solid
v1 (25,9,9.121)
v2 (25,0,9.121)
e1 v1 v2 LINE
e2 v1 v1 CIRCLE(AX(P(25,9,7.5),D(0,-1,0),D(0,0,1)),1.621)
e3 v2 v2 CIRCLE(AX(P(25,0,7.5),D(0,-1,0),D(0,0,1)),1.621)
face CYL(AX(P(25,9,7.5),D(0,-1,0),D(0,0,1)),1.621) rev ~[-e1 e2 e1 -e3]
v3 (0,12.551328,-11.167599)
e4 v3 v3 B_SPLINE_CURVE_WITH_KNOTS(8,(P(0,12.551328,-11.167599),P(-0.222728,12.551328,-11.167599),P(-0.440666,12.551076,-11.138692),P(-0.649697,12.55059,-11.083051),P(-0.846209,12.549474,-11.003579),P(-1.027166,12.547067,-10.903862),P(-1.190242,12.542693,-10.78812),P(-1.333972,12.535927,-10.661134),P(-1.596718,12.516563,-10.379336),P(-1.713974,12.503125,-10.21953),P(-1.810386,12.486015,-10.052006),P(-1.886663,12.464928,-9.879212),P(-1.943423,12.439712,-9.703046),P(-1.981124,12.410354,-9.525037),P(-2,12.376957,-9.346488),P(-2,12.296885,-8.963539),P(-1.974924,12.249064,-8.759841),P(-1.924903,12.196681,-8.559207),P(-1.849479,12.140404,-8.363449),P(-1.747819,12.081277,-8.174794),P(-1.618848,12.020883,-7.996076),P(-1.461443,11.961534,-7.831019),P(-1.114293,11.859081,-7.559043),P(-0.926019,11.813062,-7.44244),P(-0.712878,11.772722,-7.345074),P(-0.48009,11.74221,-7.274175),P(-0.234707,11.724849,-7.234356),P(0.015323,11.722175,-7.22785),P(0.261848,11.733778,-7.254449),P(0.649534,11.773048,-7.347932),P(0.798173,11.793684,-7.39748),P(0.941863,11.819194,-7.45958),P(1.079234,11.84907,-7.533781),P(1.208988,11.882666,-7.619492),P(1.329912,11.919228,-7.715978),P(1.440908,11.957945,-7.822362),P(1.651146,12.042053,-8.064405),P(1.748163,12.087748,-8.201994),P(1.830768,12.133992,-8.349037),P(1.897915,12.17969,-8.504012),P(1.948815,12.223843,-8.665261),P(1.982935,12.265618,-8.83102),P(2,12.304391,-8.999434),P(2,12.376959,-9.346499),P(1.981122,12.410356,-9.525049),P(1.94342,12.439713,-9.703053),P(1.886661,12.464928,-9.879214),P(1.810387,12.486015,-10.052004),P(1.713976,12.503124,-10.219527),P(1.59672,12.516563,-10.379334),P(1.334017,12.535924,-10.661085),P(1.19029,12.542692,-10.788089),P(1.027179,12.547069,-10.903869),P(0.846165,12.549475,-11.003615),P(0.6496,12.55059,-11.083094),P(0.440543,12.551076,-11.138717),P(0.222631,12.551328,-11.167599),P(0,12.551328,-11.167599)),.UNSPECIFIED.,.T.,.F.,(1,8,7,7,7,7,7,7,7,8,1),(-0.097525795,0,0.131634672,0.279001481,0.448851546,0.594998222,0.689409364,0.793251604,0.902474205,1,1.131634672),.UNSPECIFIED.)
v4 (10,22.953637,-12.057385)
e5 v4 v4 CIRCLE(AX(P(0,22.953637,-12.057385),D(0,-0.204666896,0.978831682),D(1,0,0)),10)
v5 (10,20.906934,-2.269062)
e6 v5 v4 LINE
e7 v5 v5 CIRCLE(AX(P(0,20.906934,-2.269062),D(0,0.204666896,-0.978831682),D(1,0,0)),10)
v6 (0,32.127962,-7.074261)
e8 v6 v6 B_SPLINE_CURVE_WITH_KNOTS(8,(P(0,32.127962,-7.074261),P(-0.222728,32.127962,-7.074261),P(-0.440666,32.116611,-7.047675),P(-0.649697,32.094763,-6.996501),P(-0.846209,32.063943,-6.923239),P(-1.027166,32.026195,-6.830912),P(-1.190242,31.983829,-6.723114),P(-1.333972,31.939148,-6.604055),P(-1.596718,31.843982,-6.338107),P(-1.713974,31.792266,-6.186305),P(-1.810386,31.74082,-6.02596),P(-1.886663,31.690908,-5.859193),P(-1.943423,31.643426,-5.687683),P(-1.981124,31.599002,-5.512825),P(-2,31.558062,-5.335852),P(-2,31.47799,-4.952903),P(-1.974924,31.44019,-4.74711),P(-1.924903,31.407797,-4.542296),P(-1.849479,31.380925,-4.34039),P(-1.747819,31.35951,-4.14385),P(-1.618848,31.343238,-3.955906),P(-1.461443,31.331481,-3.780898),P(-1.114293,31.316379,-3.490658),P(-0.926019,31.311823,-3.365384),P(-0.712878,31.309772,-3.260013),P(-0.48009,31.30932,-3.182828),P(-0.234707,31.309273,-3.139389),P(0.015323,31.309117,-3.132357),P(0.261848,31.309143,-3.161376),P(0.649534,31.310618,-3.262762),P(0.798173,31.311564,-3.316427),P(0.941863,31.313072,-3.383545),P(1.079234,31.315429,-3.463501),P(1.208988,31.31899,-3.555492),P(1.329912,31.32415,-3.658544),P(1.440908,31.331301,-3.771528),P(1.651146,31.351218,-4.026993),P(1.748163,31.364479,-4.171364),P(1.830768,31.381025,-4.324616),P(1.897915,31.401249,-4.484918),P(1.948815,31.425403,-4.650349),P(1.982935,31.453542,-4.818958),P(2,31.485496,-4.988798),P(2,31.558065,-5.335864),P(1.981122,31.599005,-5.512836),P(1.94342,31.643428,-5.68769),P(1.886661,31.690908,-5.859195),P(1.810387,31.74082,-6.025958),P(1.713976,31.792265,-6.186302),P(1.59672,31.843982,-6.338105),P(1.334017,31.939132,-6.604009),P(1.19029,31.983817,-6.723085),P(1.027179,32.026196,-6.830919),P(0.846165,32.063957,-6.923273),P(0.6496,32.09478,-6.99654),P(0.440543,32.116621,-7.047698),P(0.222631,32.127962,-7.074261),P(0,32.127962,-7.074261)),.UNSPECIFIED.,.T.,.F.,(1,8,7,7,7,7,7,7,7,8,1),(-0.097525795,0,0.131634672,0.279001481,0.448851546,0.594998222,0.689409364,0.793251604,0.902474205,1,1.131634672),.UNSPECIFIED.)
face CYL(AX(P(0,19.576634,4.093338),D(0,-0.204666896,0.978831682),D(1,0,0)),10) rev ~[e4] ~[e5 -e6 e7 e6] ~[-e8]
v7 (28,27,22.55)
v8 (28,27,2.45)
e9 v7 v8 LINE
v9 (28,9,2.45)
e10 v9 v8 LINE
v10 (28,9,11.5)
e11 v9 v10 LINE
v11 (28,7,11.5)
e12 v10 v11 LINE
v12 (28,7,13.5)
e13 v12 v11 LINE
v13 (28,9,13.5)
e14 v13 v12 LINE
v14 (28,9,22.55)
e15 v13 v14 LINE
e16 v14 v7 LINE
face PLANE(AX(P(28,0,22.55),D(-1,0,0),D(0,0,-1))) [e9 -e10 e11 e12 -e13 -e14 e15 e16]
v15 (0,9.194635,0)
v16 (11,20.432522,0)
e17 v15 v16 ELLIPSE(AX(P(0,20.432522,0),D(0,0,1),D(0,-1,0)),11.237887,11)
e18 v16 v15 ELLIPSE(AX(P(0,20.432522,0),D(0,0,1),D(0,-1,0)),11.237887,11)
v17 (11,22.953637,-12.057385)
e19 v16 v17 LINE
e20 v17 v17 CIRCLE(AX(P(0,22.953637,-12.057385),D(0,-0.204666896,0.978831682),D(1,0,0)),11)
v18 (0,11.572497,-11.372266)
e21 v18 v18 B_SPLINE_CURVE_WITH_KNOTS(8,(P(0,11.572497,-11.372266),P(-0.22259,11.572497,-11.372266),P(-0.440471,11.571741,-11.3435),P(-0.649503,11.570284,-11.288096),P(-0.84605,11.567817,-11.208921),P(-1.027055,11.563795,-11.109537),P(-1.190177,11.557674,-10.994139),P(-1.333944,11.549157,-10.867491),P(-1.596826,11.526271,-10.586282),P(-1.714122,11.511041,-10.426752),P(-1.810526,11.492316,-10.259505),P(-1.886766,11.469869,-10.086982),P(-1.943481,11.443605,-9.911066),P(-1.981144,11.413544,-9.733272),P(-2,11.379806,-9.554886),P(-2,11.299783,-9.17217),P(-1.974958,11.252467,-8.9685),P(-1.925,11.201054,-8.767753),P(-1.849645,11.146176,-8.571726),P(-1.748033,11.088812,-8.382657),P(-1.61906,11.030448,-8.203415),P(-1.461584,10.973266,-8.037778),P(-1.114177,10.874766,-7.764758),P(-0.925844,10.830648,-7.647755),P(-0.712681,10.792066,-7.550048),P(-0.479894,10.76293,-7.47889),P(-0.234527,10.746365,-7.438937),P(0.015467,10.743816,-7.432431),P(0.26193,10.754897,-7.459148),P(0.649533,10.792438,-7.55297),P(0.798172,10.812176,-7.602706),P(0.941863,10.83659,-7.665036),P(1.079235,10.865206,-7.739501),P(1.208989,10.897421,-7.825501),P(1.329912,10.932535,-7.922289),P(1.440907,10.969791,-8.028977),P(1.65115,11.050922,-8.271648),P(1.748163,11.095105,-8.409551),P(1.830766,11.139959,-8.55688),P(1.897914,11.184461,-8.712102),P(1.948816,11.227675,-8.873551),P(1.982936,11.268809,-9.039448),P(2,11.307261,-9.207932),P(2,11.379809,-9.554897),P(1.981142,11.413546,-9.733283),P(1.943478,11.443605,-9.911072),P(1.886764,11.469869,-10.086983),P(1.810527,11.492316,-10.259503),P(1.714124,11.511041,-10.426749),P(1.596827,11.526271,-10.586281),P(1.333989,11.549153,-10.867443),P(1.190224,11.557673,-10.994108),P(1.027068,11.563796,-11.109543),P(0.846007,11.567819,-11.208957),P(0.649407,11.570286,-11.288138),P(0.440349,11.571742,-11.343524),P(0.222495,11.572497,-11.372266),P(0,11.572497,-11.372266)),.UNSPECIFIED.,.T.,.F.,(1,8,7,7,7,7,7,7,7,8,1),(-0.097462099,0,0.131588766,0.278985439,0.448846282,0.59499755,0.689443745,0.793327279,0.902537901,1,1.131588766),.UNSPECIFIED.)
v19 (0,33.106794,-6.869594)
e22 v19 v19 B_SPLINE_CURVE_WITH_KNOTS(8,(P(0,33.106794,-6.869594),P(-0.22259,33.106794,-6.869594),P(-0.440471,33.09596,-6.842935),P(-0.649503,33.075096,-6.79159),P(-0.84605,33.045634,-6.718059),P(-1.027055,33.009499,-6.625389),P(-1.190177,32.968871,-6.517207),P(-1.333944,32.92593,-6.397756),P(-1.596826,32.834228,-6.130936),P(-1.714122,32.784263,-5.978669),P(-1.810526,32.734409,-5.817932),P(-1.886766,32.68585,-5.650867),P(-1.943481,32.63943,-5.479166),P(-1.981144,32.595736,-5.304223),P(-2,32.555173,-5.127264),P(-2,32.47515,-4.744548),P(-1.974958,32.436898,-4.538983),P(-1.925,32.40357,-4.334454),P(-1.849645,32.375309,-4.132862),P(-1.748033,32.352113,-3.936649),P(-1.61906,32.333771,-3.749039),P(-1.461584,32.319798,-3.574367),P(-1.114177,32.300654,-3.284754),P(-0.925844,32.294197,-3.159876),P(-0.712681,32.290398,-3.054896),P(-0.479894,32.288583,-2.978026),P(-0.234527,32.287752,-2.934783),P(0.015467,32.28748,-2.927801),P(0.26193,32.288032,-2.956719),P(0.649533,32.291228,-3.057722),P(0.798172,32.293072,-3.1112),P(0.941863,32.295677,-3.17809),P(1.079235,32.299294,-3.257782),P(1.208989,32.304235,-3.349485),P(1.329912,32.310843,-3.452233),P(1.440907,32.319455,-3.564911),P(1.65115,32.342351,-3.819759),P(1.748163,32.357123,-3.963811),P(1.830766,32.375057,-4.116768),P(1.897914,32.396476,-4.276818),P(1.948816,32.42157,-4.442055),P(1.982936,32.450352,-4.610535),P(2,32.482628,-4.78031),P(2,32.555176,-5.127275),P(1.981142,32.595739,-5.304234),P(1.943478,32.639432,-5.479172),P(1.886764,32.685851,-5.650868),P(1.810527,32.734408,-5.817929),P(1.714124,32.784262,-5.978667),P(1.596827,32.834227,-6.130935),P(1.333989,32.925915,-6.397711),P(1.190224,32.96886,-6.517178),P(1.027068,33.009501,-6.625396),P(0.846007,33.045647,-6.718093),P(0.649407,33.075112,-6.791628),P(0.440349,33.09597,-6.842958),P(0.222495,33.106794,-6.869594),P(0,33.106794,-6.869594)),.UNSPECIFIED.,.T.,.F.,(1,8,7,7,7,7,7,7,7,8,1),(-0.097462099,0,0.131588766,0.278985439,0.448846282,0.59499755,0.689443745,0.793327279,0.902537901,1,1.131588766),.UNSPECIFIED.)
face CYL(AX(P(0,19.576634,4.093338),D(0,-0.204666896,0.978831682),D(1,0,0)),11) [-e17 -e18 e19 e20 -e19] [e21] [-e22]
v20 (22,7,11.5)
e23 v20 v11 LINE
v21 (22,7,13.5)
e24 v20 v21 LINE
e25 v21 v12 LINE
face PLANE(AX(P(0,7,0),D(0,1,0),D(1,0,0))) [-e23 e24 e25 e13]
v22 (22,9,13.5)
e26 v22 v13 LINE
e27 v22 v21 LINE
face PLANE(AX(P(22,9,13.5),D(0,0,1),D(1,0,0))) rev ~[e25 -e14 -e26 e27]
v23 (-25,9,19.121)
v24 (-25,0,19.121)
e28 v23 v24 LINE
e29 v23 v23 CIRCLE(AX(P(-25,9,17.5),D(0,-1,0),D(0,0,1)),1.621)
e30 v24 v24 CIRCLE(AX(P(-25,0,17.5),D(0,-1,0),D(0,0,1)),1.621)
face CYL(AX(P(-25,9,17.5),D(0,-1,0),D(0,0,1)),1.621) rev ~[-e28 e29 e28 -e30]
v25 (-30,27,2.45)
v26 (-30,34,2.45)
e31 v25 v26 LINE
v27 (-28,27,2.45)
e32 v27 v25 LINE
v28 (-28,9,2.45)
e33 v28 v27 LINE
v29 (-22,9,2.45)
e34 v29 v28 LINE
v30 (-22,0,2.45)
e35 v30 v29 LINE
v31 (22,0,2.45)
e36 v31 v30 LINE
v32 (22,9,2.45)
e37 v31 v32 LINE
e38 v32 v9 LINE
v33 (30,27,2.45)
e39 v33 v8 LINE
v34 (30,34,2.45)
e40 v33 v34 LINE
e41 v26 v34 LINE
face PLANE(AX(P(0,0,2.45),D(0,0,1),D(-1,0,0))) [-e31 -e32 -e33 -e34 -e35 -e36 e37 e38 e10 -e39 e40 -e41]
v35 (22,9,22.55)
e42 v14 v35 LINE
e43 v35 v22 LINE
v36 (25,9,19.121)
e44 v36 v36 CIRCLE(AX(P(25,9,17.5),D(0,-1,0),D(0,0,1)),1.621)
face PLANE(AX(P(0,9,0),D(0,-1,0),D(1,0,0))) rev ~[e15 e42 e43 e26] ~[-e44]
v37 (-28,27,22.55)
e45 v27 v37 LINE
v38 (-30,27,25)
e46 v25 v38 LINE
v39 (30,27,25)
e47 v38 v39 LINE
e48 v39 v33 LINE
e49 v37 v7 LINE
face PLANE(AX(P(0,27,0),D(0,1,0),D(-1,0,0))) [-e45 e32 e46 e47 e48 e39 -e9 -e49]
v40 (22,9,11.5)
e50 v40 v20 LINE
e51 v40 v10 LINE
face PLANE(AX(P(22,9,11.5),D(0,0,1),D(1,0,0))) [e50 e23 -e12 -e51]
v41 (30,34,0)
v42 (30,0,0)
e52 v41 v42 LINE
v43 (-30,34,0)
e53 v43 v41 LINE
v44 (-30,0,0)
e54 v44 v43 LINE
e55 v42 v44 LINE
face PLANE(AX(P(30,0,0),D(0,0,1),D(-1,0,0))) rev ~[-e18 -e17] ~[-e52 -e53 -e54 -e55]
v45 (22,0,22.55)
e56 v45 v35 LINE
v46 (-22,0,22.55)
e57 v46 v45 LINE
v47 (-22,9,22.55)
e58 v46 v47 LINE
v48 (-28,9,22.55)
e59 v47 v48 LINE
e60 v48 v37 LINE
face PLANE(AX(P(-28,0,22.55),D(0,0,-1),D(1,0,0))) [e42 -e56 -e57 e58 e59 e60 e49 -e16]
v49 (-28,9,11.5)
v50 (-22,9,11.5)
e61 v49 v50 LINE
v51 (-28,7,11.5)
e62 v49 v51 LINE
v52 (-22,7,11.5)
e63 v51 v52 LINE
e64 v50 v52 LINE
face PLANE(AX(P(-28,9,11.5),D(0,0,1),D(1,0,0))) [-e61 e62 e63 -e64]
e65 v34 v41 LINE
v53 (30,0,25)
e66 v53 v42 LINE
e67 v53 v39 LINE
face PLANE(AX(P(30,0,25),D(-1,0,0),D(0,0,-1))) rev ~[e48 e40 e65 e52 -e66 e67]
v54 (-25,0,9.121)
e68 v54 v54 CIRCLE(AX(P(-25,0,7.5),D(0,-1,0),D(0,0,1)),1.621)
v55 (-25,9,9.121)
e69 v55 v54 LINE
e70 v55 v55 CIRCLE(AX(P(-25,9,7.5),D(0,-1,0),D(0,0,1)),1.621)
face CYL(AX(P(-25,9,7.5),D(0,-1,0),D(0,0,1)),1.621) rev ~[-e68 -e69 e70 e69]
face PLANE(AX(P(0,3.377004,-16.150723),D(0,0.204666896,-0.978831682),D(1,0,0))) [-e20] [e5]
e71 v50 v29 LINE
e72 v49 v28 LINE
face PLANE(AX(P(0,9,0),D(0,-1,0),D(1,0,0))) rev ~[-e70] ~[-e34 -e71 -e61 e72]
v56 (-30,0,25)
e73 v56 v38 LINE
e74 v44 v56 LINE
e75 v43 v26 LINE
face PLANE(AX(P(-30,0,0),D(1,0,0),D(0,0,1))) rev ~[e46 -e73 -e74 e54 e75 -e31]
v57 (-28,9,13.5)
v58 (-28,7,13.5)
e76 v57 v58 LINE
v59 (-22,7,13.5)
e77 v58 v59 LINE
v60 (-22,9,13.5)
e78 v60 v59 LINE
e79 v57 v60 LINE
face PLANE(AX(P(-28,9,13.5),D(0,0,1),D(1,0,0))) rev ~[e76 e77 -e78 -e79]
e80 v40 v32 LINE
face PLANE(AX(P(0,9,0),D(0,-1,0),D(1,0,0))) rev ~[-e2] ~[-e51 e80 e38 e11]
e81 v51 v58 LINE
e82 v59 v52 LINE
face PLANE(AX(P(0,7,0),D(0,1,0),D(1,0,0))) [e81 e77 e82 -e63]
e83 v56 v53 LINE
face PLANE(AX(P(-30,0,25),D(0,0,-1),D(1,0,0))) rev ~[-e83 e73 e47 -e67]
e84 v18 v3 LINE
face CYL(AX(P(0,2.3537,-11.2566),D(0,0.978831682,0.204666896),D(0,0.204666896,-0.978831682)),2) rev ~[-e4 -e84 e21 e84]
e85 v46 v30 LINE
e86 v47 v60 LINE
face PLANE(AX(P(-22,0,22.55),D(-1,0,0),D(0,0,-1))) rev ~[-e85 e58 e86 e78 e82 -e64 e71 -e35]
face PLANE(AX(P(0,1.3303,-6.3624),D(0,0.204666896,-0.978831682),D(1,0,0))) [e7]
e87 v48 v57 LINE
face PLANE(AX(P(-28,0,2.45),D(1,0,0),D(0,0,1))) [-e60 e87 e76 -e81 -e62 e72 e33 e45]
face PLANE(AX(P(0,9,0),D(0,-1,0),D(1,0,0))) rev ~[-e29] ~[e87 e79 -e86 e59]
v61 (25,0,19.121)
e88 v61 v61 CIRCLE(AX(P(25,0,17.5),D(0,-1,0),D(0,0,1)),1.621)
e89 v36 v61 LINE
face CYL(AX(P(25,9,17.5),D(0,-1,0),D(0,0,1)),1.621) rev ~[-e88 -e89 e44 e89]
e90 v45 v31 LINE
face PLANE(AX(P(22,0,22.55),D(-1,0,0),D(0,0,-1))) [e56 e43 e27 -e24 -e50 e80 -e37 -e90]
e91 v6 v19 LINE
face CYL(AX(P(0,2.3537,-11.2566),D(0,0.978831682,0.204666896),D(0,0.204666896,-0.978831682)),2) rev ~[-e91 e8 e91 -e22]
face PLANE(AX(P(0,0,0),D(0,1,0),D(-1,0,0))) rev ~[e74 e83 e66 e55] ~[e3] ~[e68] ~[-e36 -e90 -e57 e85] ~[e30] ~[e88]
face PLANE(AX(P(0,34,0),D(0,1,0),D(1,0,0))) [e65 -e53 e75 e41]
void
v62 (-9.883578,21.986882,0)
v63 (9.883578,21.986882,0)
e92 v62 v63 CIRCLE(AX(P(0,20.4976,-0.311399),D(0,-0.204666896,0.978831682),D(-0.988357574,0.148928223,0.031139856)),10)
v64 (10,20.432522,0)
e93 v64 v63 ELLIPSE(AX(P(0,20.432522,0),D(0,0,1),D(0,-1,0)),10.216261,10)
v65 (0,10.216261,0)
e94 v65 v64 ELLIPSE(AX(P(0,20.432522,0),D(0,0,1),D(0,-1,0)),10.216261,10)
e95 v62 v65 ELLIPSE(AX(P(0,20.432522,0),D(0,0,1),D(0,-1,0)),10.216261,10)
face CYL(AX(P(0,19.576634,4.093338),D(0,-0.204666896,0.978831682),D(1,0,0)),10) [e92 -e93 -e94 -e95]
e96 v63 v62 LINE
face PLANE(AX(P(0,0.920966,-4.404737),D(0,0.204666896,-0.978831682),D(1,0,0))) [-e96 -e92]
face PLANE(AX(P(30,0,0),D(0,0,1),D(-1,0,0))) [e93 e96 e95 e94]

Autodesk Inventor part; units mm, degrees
ref_plane "YZ Plane" through (0, 0, 0) normal (1, 0, 0) x (0, 1, 0)
sketch "Esquisse1" plane through (0, 0, 0) normal (0, 1, 0) x (-1, 0, 0)
  line L0 (0, 0) -> (30, 0)
  line L1 (30, 0) -> (30, 25)
  line L2 (30, 25) -> (-30, 25)
  line L3 (-30, 25) -> (-30, 0)
  line L4 (-30, 0) -> (0, 0)
  line L5 (0, 0) -> (0, 2.45)
  line L6 (0, 2.45) -> (28, 2.45)
  line L7 (28, 2.45) -> (28, 22.55)
  line L8 (28, 22.55) -> (-28, 22.55)
  line L9 (-28, 22.55) -> (-28, 2.45)
  line L10 (-28, 2.45) -> (0, 2.45)
  dimension "d0" = 30
  dimension "d1" = 25
  dimension "d2" = 60
  dimension "d3" = 30
  dimension "d4" = 2.45
  dimension "d5" = 28
  dimension "d7" = 20.1
  dimension "d8" = 56
extrude "Extrusion1" add sketch "Esquisse1" along normal blind 27
ref_plane "Plan de construction1" through (0, 0, 0) normal (0, 0.2046669, -0.9788317) x (1, 0, 0)
sketch "Esquisse10" plane through (0, 27, 0) normal (0, 1, 0) x (1, 0, 0)
  line L0 (-30, 0) -> (-30, -25) projected
  line L1 (30, -25) -> (30, 0) projected
  line L2 (-30, 0) -> (30, 0)
  line L3 (30, 0) -> (30, -2.45)
  line L4 (30, -2.45) -> (-30, -2.45)
  line L5 (-30, -2.45) -> (-30, 0)
  point P0 (0, 0)
  point P1 (30, 0)
  dimension "d67" = 2.45
extrude "Extrusion8" add sketch "Esquisse10" along normal blind 7
sketch "Esquisse2" plane through (0, 0, 0) normal (0, 0.2046669, -0.9788317) x (1, 0, 0)
  line L0 (0, 0) -> (0, -20)
  circle A0 centre (0, -20) radius 10
  circle A1 centre (0, -20) radius 11
  dimension "d12" = 20
  dimension "d13" = 20
  dimension "d14" = 22
extrude "Extrusion2" add sketch "Esquisse2" along normal blind 16.5
sketch "Esquisse3" plane through (0, 27, 0) normal (0, 1, 0) x (1, 0, 0)
  line L0 (-28, -22.55) -> (-28, -2.45) projected
  line L1 (28, -22.55) -> (-28, -22.55) projected
  line L2 (-28, -2.45) -> (28, -2.45) projected
  line L3 (28, -2.45) -> (28, -22.55) projected
  point P0 (0, 0)
extrude "Extrusion3" cut sketch "Esquisse3" against normal through all
ref_plane "Plan de construction2" through (0, 1.3303, -6.3624) normal (0, 0.2046669, -0.9788317) x (1, 0, 0)
sketch "Esquisse4" plane through (0, 1.3303, -6.3624) normal (0, 0.2046669, -0.9788317) x (1, 0, 0)
  circle A0 centre (0, -20) radius 10 projected
  point P0 (0, 0)
extrude "Extrusion4" add sketch "Esquisse4" against normal blind 2
ref_plane "Plan de construction3" through (30, 0, 0) normal (0, -0.9788317, -0.2046669) x (-1, 0, 0)
sketch "Esquisse5" plane through (30, 0, 0) normal (0, -0.9788317, -0.2046669) x (-1, 0, 0)
  line L0 (41, 16.5) -> (19, 16.5) projected
  line L1 (30, 16.5) -> (30, 11.5)
  point P0 (30, 0)
  dimension "d23" = 5
hole "Perçage1" at (0, 2.3537, -11.2566) direction (0, 0.9788317, 0.2046669) diameter 4 end through all
sketch "Esquisse6" plane through (0, 0, 0) normal (0, -1, 0) x (1, 0, 0)
  line L0 (28, 2.45) -> (28, 22.55) projected
  line L1 (-28, 22.55) -> (-28, 2.45) projected
  line L2 (28, 22.55) -> (22, 22.55)
  line L3 (28, 22.55) -> (-28, 22.55) projected
  line L4 (22, 22.55) -> (22, 2.45)
  line L5 (22, 2.45) -> (28, 2.45)
  line L6 (-28, 22.55) -> (-22, 22.55)
  line L7 (-22, 22.55) -> (-22, 2.45)
  line L8 (-22, 2.45) -> (-28, 2.45)
  point P0 (0, 0)
  dimension "d31" = 6
  dimension "d32" = 6
extrude "Extrusion5" add sketch "Esquisse6" against normal blind 9
sketch "Esquisse7" plane through (0, 9, 0) normal (0, 1, 0) x (1, 0, 0)
  line L0 (-28, -22.55) -> (-28, -2.45) projected
  line L1 (-28, -12.5) -> (-25, -12.5)
  line L2 (-25, -12.5) -> (-25, -17.5)
  line L3 (-25, -12.5) -> (-25, -7.5)
  line L4 (28, -2.45) -> (28, -22.55) projected
  line L5 (28, -22.55) -> (28, -12.5)
  line L6 (28, -12.5) -> (25, -12.5)
  line L7 (25, -12.5) -> (25, -7.5)
  line L8 (22, -22.55) -> (22, -2.45) projected
  line L9 (25, -12.5) -> (25, -17.5)
  point P0 (0, 0)
  dimension "d35" = 3
  dimension "d36" = 5
  dimension "d37" = 5
  dimension "d38" = 3
  dimension "d39" = 5
  dimension "d41" = 5
hole "Perçage2" at (-25, 9, 17.5) at (-25, 9, 7.5) at (25, 9, 17.5) at (25, 9, 7.5) direction (0, -1, 0) diameter 3.242 depth 11.8 tip angle 118 thread size "M4x0.7" class "6H" standard "ISO Metric profile"
sketch "Esquisse8" plane through (0, 9, 0) normal (0, 1, 0) x (1, 0, 0)
  line L0 (-22, -22.55) -> (-22, -2.45) projected
  line L1 (-28, -22.55) -> (-28, -2.45) projected
  line L2 (-28, -12.5) -> (-28, -11.5)
  line L3 (-28, -11.5) -> (-22, -11.5)
  line L4 (-28, -12.5) -> (-28, -13.5)
  line L5 (-28, -13.5) -> (-22, -13.5)
  line L6 (-22, -11.5) -> (-22, -13.5)
  line L7 (22, -2.45) -> (22, -22.55) projected
  line L8 (28, -2.45) -> (28, -22.55) projected
  line L9 (28, -22.55) -> (28, -12.5)
  line L10 (28, -12.5) -> (28, -11.5)
  line L11 (22, -11.5) -> (28, -11.5)
  line L12 (22, -11.5) -> (22, -13.5)
  line L13 (22, -13.5) -> (28, -13.5)
  point P0 (0, 0)
  point P1 (28, -12.5)
  point P2 (28, -13.5)
  dimension "d49" = 1
  dimension "d50" = 1
  dimension "d54" = 10.05
  dimension "d55" = 6
  dimension "d56" = 2
  dimension "d57" = 1
extrude "Extrusion6" cut sketch "Esquisse8" against normal blind 2
sketch "Esquisse11" plane through (0, 34, 0) normal (0, 1, 0) x (1, 0, 0)
  ellipse E0 centre (0, 31.4094) end of major axis (0, 85.1552) minor radius 11 (-8.5426, -2.45) -> (-7.9677, -5.6455) ccw projected
  ellipse E1 centre (0, -4.0933) end of major axis (11, -4.0933) minor radius 2.2513 (-7.9677, -5.6455) -> (7.9677, -5.6455) ccw projected
  ellipse E2 centre (0, 31.4094) end of major axis (0, 85.1552) minor radius 11 (7.9677, -5.6455) -> (8.5426, -2.45) ccw projected
  line L0 (-8.5426, -2.45) -> (8.5426, -2.45) projected
  point P0 (0, 0)
extrude "Extrusion9" cut sketch "Esquisse11" against normal blind 10
properties part number "Attache servomoteur"
